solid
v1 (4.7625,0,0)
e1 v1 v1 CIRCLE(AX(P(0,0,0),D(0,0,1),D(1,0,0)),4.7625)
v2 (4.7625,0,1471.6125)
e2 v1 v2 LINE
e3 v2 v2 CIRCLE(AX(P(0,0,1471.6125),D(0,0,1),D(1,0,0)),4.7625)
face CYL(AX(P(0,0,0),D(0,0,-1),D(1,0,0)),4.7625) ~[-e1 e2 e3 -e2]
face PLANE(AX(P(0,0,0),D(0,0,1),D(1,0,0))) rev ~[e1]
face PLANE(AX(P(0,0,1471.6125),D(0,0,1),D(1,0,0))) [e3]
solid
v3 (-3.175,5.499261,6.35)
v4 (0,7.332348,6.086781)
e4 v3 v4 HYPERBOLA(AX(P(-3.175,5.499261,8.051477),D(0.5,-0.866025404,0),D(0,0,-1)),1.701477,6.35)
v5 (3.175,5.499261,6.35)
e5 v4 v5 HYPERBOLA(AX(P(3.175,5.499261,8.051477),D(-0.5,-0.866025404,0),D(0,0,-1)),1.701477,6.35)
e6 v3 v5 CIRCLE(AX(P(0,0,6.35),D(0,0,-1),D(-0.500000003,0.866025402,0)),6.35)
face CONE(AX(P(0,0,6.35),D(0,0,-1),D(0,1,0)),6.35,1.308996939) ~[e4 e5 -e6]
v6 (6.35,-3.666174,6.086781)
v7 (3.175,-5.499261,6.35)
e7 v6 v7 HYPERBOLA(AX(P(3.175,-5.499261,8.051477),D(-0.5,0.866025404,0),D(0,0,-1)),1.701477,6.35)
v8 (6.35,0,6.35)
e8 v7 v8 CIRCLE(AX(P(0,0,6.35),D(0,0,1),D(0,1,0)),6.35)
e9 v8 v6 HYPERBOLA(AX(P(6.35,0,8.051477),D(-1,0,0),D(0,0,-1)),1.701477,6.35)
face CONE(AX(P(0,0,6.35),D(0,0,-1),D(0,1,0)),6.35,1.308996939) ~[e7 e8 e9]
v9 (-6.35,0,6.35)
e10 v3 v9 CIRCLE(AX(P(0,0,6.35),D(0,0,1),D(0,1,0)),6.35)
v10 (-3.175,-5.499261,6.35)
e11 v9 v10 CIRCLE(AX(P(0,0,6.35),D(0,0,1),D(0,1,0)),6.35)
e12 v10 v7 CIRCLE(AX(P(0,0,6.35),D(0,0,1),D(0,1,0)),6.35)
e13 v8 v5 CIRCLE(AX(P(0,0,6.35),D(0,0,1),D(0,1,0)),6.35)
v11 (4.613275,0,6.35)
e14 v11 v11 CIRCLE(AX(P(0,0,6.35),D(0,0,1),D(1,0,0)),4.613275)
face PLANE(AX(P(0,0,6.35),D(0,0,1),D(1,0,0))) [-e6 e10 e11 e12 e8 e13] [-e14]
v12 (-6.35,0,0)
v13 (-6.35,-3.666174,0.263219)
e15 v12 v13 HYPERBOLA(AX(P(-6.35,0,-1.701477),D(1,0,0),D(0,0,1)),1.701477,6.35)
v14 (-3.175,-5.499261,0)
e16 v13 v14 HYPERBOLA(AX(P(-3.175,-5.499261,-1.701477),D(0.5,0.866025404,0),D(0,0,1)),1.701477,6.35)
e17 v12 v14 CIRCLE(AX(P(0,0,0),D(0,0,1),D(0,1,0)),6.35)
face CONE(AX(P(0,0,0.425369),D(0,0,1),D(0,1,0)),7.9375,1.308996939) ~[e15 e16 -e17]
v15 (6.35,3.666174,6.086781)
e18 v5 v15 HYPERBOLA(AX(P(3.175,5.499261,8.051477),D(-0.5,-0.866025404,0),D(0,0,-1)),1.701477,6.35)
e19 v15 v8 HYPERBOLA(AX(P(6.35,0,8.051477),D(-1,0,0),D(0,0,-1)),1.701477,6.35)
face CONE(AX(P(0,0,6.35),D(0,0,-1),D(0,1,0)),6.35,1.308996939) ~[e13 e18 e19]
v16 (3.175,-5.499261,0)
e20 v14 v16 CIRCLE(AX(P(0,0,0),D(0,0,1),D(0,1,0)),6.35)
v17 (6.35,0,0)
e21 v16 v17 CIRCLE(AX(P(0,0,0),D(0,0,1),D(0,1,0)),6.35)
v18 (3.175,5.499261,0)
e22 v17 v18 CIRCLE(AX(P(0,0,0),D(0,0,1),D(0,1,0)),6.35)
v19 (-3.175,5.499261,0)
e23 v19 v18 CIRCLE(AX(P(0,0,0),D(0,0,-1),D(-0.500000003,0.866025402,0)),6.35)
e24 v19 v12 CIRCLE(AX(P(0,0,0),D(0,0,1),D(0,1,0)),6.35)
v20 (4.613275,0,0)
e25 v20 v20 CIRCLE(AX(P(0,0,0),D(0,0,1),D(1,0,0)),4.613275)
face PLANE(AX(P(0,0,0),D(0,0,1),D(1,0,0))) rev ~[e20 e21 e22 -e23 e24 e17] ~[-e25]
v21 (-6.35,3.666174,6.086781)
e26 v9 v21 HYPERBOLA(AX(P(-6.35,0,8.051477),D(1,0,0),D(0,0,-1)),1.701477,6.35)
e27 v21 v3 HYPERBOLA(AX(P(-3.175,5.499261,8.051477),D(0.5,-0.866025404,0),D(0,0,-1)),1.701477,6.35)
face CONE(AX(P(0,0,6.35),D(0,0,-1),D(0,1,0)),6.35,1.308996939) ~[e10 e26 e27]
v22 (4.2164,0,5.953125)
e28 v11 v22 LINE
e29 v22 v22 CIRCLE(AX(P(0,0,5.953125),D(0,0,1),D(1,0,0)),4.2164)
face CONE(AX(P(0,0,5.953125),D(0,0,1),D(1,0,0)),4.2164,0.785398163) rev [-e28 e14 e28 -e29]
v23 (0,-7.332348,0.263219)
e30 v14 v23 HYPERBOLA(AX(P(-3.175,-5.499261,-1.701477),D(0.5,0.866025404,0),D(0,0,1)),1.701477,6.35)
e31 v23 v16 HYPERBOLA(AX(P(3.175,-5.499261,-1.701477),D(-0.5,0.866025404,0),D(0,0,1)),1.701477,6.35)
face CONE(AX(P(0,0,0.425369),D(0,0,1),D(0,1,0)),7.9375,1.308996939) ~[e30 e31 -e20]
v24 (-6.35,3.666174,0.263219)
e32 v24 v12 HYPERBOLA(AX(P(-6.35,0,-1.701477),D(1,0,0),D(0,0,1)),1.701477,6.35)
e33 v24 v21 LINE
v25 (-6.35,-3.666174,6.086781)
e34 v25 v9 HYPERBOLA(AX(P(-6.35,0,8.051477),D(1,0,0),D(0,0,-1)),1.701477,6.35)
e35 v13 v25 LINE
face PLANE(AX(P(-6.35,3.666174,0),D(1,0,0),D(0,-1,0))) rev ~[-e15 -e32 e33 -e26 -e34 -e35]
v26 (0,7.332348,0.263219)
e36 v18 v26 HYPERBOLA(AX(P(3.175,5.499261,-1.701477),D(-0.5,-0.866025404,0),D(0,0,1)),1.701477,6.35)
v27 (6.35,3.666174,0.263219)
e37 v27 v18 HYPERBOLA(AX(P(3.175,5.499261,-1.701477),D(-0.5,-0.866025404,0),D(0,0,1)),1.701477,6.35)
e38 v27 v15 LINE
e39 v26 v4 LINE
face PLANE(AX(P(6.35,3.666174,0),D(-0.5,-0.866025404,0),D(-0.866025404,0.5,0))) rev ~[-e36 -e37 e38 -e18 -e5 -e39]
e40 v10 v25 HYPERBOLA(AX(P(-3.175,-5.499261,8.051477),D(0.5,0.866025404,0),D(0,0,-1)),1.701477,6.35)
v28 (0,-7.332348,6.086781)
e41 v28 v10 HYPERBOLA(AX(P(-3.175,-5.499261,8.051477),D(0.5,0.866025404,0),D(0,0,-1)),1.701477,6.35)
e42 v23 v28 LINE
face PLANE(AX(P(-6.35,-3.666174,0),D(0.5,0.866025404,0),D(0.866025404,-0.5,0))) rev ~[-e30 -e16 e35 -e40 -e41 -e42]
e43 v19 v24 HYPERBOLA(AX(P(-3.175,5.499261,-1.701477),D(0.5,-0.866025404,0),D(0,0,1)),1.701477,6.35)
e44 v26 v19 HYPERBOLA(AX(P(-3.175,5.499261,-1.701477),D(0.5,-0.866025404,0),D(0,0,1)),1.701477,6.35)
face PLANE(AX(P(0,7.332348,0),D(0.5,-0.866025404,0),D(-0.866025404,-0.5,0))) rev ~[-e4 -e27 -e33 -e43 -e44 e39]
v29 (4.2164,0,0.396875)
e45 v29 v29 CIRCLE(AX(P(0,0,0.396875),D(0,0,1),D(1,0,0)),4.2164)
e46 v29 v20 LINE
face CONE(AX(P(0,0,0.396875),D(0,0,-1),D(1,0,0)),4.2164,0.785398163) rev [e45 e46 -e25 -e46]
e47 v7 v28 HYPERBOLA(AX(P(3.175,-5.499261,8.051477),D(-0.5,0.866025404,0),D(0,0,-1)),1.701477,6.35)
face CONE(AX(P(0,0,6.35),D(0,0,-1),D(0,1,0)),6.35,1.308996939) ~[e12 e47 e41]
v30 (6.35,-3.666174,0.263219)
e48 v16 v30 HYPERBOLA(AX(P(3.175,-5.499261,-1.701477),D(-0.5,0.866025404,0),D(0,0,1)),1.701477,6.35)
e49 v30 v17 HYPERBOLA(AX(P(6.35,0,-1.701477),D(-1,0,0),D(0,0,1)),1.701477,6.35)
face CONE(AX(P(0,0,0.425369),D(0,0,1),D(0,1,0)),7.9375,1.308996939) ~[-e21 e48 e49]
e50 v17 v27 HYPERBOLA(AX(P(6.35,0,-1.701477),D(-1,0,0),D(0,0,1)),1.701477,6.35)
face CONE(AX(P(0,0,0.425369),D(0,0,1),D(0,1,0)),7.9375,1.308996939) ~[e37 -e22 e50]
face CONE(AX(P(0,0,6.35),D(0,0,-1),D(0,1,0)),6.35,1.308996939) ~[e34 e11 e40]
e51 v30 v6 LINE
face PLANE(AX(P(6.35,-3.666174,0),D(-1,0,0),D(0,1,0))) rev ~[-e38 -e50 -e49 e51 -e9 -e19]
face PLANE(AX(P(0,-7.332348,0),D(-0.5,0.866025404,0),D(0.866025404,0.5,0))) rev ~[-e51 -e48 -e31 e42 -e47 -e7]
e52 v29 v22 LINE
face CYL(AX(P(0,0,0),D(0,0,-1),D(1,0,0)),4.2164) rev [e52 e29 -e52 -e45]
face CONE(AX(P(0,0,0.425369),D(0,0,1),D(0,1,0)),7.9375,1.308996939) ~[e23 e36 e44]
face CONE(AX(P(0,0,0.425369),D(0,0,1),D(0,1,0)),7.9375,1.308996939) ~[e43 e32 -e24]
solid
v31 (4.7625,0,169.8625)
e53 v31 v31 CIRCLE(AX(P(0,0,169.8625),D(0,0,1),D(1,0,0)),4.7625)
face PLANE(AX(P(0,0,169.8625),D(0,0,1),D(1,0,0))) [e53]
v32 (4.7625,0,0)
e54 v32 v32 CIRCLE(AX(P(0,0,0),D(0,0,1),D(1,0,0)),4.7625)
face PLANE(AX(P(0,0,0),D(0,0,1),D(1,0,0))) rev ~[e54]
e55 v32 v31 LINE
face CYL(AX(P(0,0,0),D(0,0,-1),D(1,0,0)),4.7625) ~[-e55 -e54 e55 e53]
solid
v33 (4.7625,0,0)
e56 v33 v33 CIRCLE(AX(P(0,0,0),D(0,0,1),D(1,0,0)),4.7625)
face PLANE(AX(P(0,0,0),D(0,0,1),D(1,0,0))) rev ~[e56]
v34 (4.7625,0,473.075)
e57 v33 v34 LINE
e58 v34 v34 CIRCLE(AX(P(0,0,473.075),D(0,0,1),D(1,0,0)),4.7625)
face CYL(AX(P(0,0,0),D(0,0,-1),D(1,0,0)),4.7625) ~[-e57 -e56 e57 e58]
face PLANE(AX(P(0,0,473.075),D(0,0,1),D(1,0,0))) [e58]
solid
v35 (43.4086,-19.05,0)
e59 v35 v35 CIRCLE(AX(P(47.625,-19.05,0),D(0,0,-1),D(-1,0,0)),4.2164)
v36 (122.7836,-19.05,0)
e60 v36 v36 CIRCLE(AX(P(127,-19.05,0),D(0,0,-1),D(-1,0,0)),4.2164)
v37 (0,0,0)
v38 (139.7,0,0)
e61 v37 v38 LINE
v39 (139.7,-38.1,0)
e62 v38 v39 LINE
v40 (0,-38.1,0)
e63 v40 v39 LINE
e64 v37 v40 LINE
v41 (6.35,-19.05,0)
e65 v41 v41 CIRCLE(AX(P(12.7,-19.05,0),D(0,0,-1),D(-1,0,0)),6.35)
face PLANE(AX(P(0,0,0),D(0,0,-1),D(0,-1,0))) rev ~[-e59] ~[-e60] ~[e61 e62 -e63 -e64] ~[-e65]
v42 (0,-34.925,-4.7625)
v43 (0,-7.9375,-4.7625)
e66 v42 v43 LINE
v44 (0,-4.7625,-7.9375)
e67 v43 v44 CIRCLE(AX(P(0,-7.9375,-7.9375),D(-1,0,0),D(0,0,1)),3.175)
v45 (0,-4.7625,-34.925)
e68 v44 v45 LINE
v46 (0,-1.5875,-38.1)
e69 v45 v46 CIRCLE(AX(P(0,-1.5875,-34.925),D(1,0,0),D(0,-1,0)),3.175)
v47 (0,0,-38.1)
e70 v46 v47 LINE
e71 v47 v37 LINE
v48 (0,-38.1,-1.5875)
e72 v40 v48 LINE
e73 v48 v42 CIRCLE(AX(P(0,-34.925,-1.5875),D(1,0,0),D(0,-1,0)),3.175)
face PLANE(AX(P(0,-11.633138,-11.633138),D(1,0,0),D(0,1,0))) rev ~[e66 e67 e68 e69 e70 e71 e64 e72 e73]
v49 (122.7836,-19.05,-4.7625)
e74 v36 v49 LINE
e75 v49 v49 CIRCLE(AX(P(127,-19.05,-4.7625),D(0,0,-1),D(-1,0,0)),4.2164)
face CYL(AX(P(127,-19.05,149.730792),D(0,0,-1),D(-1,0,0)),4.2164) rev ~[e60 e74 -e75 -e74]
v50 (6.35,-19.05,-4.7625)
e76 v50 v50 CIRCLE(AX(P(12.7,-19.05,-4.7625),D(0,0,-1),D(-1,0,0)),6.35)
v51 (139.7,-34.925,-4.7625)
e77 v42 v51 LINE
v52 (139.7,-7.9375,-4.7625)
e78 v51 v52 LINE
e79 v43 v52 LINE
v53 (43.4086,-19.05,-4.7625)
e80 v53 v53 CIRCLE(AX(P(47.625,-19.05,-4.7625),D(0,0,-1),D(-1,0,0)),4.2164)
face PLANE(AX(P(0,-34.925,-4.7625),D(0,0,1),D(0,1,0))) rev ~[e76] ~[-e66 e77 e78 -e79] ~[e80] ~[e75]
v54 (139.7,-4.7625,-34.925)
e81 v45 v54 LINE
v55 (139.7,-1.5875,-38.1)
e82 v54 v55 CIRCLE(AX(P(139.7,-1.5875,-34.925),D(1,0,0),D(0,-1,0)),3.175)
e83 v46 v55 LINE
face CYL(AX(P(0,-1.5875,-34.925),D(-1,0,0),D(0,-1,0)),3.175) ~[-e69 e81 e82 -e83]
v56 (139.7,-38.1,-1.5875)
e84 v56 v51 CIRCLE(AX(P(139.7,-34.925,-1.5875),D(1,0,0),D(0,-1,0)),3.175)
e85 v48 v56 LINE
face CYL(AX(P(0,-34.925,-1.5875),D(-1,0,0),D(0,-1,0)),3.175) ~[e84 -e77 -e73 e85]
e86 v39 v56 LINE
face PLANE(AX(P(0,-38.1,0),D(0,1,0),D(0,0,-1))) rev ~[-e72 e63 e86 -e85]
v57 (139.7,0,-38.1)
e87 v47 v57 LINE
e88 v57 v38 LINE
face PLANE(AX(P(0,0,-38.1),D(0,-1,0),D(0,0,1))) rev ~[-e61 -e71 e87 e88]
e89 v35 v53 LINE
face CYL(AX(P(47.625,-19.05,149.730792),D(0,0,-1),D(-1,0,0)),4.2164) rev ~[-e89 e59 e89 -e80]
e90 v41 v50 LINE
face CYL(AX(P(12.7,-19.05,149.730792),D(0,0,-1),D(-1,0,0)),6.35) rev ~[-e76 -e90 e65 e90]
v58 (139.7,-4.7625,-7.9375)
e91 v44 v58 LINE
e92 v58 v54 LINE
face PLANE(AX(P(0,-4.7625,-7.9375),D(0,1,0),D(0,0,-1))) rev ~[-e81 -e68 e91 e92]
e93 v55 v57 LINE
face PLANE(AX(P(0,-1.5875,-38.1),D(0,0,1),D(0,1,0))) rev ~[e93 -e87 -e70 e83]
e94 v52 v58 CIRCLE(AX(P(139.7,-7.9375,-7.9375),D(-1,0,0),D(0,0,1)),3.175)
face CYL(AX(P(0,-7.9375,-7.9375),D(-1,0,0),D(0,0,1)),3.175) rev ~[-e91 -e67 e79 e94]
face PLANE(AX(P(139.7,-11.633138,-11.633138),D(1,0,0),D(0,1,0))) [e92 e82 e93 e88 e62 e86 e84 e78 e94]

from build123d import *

# Parameters (mm, degrees)
F1_DEPTH  = 139.7
F3_D      = 8.4328
F4_D      = 12.7
F5_R      = 4.7625
F6_DEPTH  = 169.8625
F7_DEPTH  = 1471.6125
F8_DEPTH  = 473.075
F9_R      = 4.2164
F10_DEPTH = 6.35
F13_SIZE2 = 0.396875
F13_SIZE  = 0.396875


# Not quite as in the source:
# - a length typed as a fraction of an inch, garbled in the dataset ("3 / 203.2 mm" for 3/8 in), is restored


with BuildPart() as f1:
    # F0 (on Right) → F1 (new body)
    with BuildSketch(Plane.YZ):
        with BuildLine():
            Line((0, -38.1), (0, 0))
            Line((0, 0), (-38.1, 0))
            Line((-38.1, 0), (-38.1, -1.5875))
            ThreePointArc((-38.1, -1.5875), (-37.1700640303, -3.8325640303), (-34.925, -4.7625))
            Line((-34.925, -4.7625), (-7.9375, -4.7625))
            ThreePointArc((-7.9375, -4.7625), (-5.6924359697, -5.6924359697), (-4.7625, -7.9375))
            Line((-4.7625, -7.9375), (-4.7625, -34.925))
            ThreePointArc((-4.7625, -34.925), (-3.8325640303, -37.1700640303), (-1.5875, -38.1))
            Line((-1.5875, -38.1), (0, -38.1))
        make_face()
    extrude(amount=F1_DEPTH)

    # F3 (through all)
    with Locations(Plane.XY):
        with Locations((47.625, -19.05), (127, -19.05)):
            Hole(F3_D / 2)

    # F4 (through all)
    with Locations(Plane.XY):
        with Locations((12.7, -19.05)):
            Hole(F4_D / 2)


with BuildPart() as f6:
    # F5 (on Top) → F6 (new body)
    with BuildSketch(Plane.XY):
        Circle(F5_R)
    extrude(amount=F6_DEPTH)


with BuildPart() as f7:
    # F5 (on Top) → F7 (new body)
    with BuildSketch(Plane.XY):
        Circle(F5_R)
    extrude(amount=F7_DEPTH)


with BuildPart() as f8:
    # F5 (on Top) → F8 (new body)
    with BuildSketch(Plane.XY):
        Circle(F5_R)
    extrude(amount=F8_DEPTH)


with BuildPart() as f10:
    # F9 (on Top) → F10 (new body)
    with BuildSketch(Plane.XY):
        Polygon((6.35, -3.6661742094), (6.35, 3.6661742094), (0, 7.3323484187), (-6.35, 3.6661742094), (-6.35, -3.6661742094), (0, -7.3323484187), align=None)
        Circle(F9_R, mode=Mode.SUBTRACT)
    extrude(amount=F10_DEPTH)

    # F11 (on Right) → F12 (revolve, cut)
    with BuildSketch(Plane.YZ):
        Polygon((7.9375, 6.35), (6.35, 6.35), (7.9375, 5.924630657), align=None)
        Polygon((7.9375, 0.425369343), (6.35, 0), (7.9375, 0), align=None)
    revolve(axis=Axis((0, 0, 2.923237852), (0, 0, 1)), mode=Mode.SUBTRACT)

    # F13
    f13_edges = [f10.edges().sort_by_distance(p)[0] for p in [
        (-4.2164, 0, 6.35),
        (-4.2164, 0, 0),
    ]]
    chamfer(f13_edges, length=F13_SIZE, length2=F13_SIZE2)


solid = Compound([f1.part, f6.part, f7.part, f8.part, f10.part])
